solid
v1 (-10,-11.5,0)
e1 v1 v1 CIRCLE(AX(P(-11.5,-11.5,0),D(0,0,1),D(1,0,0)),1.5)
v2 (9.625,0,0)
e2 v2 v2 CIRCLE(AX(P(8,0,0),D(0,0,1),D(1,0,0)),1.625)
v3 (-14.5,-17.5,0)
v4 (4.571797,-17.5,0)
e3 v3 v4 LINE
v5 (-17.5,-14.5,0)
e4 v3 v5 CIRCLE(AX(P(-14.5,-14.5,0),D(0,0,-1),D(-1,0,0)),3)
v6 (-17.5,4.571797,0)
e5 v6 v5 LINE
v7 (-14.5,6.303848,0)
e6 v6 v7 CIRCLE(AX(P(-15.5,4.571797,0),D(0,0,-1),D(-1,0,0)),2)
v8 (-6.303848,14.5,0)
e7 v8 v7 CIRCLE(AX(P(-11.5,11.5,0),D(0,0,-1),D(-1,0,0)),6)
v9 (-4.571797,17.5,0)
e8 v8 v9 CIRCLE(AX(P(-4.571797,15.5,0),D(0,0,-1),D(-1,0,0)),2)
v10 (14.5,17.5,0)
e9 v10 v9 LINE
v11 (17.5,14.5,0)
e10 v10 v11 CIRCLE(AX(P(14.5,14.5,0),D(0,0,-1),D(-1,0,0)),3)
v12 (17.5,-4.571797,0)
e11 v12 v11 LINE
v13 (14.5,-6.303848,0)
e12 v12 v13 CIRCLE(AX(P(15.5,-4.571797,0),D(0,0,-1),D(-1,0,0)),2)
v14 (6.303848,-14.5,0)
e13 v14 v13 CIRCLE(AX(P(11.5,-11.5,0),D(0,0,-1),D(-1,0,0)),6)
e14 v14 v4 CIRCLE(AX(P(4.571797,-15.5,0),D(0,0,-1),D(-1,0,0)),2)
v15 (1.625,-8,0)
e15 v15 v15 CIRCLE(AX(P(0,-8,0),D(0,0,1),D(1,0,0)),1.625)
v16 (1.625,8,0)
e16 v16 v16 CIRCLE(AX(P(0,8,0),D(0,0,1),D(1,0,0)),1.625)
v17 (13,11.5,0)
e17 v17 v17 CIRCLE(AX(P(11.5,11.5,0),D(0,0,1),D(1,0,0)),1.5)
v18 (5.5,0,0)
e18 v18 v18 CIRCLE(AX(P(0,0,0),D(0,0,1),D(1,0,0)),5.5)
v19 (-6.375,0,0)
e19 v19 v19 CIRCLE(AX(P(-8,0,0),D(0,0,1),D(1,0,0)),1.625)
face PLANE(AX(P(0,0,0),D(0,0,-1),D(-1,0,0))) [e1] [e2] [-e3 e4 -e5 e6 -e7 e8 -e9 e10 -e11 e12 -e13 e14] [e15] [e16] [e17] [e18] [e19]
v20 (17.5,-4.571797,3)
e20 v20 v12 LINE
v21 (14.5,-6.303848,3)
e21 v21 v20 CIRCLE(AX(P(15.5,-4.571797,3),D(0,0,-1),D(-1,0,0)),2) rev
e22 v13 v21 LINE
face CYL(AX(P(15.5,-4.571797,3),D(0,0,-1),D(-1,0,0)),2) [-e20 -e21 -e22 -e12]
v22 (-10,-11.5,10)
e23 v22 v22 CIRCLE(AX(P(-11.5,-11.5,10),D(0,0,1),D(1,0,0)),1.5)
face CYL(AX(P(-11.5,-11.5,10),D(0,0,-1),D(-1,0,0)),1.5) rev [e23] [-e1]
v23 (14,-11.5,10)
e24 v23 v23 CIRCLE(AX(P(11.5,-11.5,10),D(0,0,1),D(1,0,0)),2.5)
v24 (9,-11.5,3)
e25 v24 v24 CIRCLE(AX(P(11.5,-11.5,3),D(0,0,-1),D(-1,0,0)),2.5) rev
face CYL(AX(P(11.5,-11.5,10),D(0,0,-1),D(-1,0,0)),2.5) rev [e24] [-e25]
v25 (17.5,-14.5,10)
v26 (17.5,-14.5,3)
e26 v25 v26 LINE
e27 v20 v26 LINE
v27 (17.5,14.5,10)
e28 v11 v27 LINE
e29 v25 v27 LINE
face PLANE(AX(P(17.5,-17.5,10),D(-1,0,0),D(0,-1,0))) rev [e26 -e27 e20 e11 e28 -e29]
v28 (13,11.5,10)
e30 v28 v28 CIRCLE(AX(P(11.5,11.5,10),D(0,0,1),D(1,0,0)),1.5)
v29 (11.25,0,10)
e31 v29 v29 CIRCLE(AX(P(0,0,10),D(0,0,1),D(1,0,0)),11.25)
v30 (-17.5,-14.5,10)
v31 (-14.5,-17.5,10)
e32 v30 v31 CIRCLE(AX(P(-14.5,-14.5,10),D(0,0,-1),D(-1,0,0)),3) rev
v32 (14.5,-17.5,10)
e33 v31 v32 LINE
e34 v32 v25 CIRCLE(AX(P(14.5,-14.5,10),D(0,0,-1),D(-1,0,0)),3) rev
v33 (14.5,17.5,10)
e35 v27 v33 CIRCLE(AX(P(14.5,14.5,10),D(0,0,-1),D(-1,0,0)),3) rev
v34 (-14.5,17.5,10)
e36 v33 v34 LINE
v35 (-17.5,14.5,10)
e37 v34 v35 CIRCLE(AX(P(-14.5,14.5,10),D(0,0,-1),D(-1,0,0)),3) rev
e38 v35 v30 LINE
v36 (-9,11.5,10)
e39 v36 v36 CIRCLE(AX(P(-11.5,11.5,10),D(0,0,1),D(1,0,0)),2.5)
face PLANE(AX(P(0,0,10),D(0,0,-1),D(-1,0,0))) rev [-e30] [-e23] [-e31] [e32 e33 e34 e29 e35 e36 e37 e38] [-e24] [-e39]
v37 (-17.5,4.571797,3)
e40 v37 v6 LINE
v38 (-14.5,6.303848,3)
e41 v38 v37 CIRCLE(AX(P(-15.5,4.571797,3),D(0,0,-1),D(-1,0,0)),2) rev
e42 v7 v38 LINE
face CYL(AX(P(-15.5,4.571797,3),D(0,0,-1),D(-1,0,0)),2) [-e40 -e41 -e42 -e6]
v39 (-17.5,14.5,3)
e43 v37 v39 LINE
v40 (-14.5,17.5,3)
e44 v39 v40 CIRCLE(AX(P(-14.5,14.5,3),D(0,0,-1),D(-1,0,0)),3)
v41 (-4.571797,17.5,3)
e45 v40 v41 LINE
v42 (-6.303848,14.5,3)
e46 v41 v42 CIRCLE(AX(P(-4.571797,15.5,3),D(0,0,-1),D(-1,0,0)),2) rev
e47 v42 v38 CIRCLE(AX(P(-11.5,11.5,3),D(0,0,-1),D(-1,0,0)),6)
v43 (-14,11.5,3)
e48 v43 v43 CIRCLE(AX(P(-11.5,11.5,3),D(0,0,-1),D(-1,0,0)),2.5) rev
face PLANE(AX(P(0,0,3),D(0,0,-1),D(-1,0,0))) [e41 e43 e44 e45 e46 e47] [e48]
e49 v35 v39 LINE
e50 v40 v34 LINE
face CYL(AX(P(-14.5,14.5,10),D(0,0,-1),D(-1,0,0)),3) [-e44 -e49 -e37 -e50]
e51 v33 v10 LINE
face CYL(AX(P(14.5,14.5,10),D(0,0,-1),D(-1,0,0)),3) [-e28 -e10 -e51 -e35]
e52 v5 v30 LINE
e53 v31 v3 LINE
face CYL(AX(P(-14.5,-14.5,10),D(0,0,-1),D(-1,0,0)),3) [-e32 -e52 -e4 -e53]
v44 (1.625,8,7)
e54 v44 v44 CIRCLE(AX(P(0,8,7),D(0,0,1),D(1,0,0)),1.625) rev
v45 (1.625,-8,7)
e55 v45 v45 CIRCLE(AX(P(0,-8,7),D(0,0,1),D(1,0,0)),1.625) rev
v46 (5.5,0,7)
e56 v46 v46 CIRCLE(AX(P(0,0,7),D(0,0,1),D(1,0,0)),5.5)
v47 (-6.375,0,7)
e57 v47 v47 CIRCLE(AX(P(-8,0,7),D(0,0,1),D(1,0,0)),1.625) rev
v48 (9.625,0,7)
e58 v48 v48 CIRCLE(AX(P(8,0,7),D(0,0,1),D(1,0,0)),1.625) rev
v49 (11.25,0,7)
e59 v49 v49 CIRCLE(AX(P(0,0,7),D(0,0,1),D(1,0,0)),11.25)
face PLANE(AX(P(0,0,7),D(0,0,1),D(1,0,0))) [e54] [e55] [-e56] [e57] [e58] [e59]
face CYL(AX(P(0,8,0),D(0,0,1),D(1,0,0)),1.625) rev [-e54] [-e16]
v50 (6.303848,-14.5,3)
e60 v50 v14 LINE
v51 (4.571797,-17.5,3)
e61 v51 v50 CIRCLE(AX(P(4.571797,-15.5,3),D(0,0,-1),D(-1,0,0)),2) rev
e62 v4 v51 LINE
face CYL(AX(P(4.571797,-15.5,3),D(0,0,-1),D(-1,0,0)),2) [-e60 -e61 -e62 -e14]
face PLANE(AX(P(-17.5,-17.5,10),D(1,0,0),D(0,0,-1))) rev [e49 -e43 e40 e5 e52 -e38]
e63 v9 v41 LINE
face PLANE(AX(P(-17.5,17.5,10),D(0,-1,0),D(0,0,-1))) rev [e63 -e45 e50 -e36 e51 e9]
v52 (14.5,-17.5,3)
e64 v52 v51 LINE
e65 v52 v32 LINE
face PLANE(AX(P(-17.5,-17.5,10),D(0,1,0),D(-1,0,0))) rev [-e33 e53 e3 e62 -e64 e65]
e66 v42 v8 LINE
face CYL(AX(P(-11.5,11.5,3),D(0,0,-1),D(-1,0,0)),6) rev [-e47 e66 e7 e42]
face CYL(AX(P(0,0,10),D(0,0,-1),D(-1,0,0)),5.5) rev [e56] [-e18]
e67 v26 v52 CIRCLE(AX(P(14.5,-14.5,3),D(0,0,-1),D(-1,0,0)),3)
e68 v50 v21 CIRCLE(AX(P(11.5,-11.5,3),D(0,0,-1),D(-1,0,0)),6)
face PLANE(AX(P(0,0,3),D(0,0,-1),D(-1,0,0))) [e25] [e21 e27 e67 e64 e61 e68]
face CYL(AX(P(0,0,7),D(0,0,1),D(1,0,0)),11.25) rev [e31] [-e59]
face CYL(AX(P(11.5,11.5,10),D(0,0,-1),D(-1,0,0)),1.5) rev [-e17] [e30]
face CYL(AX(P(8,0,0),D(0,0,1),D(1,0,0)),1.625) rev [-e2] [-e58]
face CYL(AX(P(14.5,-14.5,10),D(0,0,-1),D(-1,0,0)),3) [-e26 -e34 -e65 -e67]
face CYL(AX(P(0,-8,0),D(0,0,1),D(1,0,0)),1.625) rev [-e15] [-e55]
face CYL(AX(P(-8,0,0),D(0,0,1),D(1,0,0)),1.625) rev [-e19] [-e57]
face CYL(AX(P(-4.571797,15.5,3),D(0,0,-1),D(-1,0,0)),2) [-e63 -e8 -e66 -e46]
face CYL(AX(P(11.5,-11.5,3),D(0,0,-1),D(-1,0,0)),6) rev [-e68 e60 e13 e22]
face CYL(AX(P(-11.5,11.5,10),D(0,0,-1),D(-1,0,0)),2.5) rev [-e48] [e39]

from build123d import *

# Parameters (mm, degrees)
SKETCH1_W           = 35
SKETCH1_H           = 35
SKETCH1_R           = 5.5
SKETCH1_R_2         = 2.5
SKETCH1_R_3         = 1.5
BOSS_EXTRUDE1_DEPTH = 10
FILLET1_R           = 3
SKETCH2_R           = 1.625
CUT_EXTRUDE1_DEPTH  = 10
SKETCH3_R           = 11.25
CUT_EXTRUDE2_DEPTH  = 3
SKETCH5_R           = 2.5
CUT_EXTRUDE4_DEPTH  = 3
FILLET2_R           = 2


with BuildPart() as part:
    # Sketch1 → Boss-Extrude1 (new body)
    with BuildSketch(Plane.XY):
        Rectangle(SKETCH1_W, SKETCH1_H)
        Circle(SKETCH1_R, mode=Mode.SUBTRACT)
        with Locations((-11.5, 11.5)):
            Circle(SKETCH1_R_2, mode=Mode.SUBTRACT)
        with Locations((11.5, 11.5)):
            Circle(SKETCH1_R_3, mode=Mode.SUBTRACT)
        with Locations((11.5, -11.5)):
            Circle(SKETCH1_R_2, mode=Mode.SUBTRACT)
        with Locations((-11.5, -11.5)):
            Circle(SKETCH1_R_3, mode=Mode.SUBTRACT)
    extrude(amount=BOSS_EXTRUDE1_DEPTH)

    # Fillet1
    fillet1_edges = [part.edges().sort_by_distance(p)[0] for p in [
        (17.5, -17.5, 5),
        (-17.5, -17.5, 5),
        (-17.5, 17.5, 5),
        (17.5, 17.5, 5),
    ]]
    fillet(fillet1_edges, radius=FILLET1_R)

    # Sketch2 → Cut-Extrude1 (cut)
    with BuildSketch(Plane.XY.offset(10)):
        with Locations((-8, 0)):
            Circle(SKETCH2_R)
        with Locations((0, 8)):
            Circle(SKETCH2_R)
        with Locations((8, 0)):
            Circle(SKETCH2_R)
        with Locations((0, -8)):
            Circle(SKETCH2_R)
    extrude(amount=-CUT_EXTRUDE1_DEPTH, mode=Mode.SUBTRACT)

    # Sketch3 → Cut-Extrude2 (cut)
    with BuildSketch(Plane.XY.offset(10)):
        Circle(SKETCH3_R)
    extrude(amount=-CUT_EXTRUDE2_DEPTH, mode=Mode.SUBTRACT)

    # Sketch5 → Cut-Extrude4 (cut)
    # profile 1 of 2: a face of its own
    with BuildSketch(Plane(origin=(0, 0, 0), x_dir=(-1, 0, 0), z_dir=(0, 0, -1))):
        with BuildLine():
            Line((-15.742640687, -7.257359313), (-17.5, -9.014718626))
            Line((-17.5, -9.014718626), (-17.5, -14.5))
            ThreePointArc((-17.5, -14.5), (-16.621320344, -16.621320344), (-14.5, -17.5))
            Line((-14.5, -17.5), (-9.014718626, -17.5))
            Line((-9.014718626, -17.5), (-7.257359313, -15.742640687))
            ThreePointArc((-7.257359313, -15.742640687), (-7.257359313, -7.257359313), (-15.742640687, -7.257359313))
        make_face()
        with Locations((-11.5, -11.5)):
            Circle(SKETCH5_R, mode=Mode.SUBTRACT)
    # profile 2 of 2: a face of its own
    with BuildSketch(Plane(origin=(0, 0, 0), x_dir=(-1, 0, 0), z_dir=(0, 0, -1))):
        with BuildLine():
            Line((9.014718626, 17.5), (7.257359313, 15.742640687))
            ThreePointArc((7.257359313, 15.742640687), (7.257359313, 7.257359313), (15.742640687, 7.257359313))
            Line((15.742640687, 7.257359313), (17.5, 9.014718626))
            Line((17.5, 9.014718626), (17.5, 14.5))
            ThreePointArc((17.5, 14.5), (16.621320344, 16.621320344), (14.5, 17.5))
            Line((14.5, 17.5), (9.014718626, 17.5))
        make_face()
        with Locations((11.5, 11.5)):
            Circle(SKETCH5_R, mode=Mode.SUBTRACT)
    extrude(amount=-CUT_EXTRUDE4_DEPTH, mode=Mode.SUBTRACT)

    # Fillet2
    # the kernel refuses this fillet: 2 mm, written as the material it takes off along each edge
    with BuildSketch(Plane(origin=(-9.014718626, 17.5, -11.10730464), x_dir=(0.6704488170211711, -0.7419557828839344, 0), z_dir=(0, 0, 1))) as fillet2_piece_1:
        with BuildLine():
            CenterArc((4.462663268, 1.95555393), FILLET2_R, 137.89828583, 120)
            Line((2.978751702, 3.296451564), (2.830360546, 3.430541327))
            Line((2.830360546, 3.430541327), (-0.148391157, 0.134089763))
            Line((-0.148391157, 0.134089763), (0.010112612, -0.199744174))
            ThreePointArc((0.010112612, -0.199744174), (2.492214989, -0.074080742), (4.001438073, -0.195555393))
            Line((4.001438073, -0.195555393), (4.043367636, 0))
        make_face()
    extrude(amount=14.10730464, mode=Mode.SUBTRACT)
    with BuildSketch(Plane(origin=(-17.5, 9.014718626, -11.10730464), x_dir=(0, -1, 0), z_dir=(0, 0, 1)), Plane(origin=(17.5, -9.014718626, -11.10730464), x_dir=(0, 1, 0), z_dir=(0, 0, 1))) as fillet2_piece_2:
        with BuildLine():
            CenterArc((4.442921856, 2), FILLET2_R, 150, 120)
            Line((2.710871048, 3), (2.537665968, 3.1))
            ThreePointArc((2.537665968, 3.1), (1.615937957, 1.898780669), (-0.141421356, 0.141421356))
            Line((-0.141421356, 0.141421356), (0, -0.2))
            Line((0, -0.2), (4.442921856, -0.2))
            Line((4.442921856, -0.2), (4.442921856, 0))
        make_face()
    extrude(amount=14.10730464, mode=Mode.SUBTRACT)
    with BuildSketch(Plane(origin=(9.014718626, -17.5, -11.10730464), x_dir=(-1, 0, 0), z_dir=(0, 0, 1))) as fillet2_piece_3:
        with BuildLine():
            CenterArc((4.442921856, -2), FILLET2_R, 90, 120)
            Line((2.710871048, -3), (2.537665968, -3.1))
            ThreePointArc((2.537665968, -3.1), (1.615937957, -1.898780669), (-0.141421356, -0.141421356))
            Line((-0.141421356, -0.141421356), (0, 0.2))
            Line((0, 0.2), (4.442921856, 0.2))
            Line((4.442921856, 0.2), (4.442921856, 0))
        make_face()
    extrude(amount=14.10730464, mode=Mode.SUBTRACT)


solid = part.part
